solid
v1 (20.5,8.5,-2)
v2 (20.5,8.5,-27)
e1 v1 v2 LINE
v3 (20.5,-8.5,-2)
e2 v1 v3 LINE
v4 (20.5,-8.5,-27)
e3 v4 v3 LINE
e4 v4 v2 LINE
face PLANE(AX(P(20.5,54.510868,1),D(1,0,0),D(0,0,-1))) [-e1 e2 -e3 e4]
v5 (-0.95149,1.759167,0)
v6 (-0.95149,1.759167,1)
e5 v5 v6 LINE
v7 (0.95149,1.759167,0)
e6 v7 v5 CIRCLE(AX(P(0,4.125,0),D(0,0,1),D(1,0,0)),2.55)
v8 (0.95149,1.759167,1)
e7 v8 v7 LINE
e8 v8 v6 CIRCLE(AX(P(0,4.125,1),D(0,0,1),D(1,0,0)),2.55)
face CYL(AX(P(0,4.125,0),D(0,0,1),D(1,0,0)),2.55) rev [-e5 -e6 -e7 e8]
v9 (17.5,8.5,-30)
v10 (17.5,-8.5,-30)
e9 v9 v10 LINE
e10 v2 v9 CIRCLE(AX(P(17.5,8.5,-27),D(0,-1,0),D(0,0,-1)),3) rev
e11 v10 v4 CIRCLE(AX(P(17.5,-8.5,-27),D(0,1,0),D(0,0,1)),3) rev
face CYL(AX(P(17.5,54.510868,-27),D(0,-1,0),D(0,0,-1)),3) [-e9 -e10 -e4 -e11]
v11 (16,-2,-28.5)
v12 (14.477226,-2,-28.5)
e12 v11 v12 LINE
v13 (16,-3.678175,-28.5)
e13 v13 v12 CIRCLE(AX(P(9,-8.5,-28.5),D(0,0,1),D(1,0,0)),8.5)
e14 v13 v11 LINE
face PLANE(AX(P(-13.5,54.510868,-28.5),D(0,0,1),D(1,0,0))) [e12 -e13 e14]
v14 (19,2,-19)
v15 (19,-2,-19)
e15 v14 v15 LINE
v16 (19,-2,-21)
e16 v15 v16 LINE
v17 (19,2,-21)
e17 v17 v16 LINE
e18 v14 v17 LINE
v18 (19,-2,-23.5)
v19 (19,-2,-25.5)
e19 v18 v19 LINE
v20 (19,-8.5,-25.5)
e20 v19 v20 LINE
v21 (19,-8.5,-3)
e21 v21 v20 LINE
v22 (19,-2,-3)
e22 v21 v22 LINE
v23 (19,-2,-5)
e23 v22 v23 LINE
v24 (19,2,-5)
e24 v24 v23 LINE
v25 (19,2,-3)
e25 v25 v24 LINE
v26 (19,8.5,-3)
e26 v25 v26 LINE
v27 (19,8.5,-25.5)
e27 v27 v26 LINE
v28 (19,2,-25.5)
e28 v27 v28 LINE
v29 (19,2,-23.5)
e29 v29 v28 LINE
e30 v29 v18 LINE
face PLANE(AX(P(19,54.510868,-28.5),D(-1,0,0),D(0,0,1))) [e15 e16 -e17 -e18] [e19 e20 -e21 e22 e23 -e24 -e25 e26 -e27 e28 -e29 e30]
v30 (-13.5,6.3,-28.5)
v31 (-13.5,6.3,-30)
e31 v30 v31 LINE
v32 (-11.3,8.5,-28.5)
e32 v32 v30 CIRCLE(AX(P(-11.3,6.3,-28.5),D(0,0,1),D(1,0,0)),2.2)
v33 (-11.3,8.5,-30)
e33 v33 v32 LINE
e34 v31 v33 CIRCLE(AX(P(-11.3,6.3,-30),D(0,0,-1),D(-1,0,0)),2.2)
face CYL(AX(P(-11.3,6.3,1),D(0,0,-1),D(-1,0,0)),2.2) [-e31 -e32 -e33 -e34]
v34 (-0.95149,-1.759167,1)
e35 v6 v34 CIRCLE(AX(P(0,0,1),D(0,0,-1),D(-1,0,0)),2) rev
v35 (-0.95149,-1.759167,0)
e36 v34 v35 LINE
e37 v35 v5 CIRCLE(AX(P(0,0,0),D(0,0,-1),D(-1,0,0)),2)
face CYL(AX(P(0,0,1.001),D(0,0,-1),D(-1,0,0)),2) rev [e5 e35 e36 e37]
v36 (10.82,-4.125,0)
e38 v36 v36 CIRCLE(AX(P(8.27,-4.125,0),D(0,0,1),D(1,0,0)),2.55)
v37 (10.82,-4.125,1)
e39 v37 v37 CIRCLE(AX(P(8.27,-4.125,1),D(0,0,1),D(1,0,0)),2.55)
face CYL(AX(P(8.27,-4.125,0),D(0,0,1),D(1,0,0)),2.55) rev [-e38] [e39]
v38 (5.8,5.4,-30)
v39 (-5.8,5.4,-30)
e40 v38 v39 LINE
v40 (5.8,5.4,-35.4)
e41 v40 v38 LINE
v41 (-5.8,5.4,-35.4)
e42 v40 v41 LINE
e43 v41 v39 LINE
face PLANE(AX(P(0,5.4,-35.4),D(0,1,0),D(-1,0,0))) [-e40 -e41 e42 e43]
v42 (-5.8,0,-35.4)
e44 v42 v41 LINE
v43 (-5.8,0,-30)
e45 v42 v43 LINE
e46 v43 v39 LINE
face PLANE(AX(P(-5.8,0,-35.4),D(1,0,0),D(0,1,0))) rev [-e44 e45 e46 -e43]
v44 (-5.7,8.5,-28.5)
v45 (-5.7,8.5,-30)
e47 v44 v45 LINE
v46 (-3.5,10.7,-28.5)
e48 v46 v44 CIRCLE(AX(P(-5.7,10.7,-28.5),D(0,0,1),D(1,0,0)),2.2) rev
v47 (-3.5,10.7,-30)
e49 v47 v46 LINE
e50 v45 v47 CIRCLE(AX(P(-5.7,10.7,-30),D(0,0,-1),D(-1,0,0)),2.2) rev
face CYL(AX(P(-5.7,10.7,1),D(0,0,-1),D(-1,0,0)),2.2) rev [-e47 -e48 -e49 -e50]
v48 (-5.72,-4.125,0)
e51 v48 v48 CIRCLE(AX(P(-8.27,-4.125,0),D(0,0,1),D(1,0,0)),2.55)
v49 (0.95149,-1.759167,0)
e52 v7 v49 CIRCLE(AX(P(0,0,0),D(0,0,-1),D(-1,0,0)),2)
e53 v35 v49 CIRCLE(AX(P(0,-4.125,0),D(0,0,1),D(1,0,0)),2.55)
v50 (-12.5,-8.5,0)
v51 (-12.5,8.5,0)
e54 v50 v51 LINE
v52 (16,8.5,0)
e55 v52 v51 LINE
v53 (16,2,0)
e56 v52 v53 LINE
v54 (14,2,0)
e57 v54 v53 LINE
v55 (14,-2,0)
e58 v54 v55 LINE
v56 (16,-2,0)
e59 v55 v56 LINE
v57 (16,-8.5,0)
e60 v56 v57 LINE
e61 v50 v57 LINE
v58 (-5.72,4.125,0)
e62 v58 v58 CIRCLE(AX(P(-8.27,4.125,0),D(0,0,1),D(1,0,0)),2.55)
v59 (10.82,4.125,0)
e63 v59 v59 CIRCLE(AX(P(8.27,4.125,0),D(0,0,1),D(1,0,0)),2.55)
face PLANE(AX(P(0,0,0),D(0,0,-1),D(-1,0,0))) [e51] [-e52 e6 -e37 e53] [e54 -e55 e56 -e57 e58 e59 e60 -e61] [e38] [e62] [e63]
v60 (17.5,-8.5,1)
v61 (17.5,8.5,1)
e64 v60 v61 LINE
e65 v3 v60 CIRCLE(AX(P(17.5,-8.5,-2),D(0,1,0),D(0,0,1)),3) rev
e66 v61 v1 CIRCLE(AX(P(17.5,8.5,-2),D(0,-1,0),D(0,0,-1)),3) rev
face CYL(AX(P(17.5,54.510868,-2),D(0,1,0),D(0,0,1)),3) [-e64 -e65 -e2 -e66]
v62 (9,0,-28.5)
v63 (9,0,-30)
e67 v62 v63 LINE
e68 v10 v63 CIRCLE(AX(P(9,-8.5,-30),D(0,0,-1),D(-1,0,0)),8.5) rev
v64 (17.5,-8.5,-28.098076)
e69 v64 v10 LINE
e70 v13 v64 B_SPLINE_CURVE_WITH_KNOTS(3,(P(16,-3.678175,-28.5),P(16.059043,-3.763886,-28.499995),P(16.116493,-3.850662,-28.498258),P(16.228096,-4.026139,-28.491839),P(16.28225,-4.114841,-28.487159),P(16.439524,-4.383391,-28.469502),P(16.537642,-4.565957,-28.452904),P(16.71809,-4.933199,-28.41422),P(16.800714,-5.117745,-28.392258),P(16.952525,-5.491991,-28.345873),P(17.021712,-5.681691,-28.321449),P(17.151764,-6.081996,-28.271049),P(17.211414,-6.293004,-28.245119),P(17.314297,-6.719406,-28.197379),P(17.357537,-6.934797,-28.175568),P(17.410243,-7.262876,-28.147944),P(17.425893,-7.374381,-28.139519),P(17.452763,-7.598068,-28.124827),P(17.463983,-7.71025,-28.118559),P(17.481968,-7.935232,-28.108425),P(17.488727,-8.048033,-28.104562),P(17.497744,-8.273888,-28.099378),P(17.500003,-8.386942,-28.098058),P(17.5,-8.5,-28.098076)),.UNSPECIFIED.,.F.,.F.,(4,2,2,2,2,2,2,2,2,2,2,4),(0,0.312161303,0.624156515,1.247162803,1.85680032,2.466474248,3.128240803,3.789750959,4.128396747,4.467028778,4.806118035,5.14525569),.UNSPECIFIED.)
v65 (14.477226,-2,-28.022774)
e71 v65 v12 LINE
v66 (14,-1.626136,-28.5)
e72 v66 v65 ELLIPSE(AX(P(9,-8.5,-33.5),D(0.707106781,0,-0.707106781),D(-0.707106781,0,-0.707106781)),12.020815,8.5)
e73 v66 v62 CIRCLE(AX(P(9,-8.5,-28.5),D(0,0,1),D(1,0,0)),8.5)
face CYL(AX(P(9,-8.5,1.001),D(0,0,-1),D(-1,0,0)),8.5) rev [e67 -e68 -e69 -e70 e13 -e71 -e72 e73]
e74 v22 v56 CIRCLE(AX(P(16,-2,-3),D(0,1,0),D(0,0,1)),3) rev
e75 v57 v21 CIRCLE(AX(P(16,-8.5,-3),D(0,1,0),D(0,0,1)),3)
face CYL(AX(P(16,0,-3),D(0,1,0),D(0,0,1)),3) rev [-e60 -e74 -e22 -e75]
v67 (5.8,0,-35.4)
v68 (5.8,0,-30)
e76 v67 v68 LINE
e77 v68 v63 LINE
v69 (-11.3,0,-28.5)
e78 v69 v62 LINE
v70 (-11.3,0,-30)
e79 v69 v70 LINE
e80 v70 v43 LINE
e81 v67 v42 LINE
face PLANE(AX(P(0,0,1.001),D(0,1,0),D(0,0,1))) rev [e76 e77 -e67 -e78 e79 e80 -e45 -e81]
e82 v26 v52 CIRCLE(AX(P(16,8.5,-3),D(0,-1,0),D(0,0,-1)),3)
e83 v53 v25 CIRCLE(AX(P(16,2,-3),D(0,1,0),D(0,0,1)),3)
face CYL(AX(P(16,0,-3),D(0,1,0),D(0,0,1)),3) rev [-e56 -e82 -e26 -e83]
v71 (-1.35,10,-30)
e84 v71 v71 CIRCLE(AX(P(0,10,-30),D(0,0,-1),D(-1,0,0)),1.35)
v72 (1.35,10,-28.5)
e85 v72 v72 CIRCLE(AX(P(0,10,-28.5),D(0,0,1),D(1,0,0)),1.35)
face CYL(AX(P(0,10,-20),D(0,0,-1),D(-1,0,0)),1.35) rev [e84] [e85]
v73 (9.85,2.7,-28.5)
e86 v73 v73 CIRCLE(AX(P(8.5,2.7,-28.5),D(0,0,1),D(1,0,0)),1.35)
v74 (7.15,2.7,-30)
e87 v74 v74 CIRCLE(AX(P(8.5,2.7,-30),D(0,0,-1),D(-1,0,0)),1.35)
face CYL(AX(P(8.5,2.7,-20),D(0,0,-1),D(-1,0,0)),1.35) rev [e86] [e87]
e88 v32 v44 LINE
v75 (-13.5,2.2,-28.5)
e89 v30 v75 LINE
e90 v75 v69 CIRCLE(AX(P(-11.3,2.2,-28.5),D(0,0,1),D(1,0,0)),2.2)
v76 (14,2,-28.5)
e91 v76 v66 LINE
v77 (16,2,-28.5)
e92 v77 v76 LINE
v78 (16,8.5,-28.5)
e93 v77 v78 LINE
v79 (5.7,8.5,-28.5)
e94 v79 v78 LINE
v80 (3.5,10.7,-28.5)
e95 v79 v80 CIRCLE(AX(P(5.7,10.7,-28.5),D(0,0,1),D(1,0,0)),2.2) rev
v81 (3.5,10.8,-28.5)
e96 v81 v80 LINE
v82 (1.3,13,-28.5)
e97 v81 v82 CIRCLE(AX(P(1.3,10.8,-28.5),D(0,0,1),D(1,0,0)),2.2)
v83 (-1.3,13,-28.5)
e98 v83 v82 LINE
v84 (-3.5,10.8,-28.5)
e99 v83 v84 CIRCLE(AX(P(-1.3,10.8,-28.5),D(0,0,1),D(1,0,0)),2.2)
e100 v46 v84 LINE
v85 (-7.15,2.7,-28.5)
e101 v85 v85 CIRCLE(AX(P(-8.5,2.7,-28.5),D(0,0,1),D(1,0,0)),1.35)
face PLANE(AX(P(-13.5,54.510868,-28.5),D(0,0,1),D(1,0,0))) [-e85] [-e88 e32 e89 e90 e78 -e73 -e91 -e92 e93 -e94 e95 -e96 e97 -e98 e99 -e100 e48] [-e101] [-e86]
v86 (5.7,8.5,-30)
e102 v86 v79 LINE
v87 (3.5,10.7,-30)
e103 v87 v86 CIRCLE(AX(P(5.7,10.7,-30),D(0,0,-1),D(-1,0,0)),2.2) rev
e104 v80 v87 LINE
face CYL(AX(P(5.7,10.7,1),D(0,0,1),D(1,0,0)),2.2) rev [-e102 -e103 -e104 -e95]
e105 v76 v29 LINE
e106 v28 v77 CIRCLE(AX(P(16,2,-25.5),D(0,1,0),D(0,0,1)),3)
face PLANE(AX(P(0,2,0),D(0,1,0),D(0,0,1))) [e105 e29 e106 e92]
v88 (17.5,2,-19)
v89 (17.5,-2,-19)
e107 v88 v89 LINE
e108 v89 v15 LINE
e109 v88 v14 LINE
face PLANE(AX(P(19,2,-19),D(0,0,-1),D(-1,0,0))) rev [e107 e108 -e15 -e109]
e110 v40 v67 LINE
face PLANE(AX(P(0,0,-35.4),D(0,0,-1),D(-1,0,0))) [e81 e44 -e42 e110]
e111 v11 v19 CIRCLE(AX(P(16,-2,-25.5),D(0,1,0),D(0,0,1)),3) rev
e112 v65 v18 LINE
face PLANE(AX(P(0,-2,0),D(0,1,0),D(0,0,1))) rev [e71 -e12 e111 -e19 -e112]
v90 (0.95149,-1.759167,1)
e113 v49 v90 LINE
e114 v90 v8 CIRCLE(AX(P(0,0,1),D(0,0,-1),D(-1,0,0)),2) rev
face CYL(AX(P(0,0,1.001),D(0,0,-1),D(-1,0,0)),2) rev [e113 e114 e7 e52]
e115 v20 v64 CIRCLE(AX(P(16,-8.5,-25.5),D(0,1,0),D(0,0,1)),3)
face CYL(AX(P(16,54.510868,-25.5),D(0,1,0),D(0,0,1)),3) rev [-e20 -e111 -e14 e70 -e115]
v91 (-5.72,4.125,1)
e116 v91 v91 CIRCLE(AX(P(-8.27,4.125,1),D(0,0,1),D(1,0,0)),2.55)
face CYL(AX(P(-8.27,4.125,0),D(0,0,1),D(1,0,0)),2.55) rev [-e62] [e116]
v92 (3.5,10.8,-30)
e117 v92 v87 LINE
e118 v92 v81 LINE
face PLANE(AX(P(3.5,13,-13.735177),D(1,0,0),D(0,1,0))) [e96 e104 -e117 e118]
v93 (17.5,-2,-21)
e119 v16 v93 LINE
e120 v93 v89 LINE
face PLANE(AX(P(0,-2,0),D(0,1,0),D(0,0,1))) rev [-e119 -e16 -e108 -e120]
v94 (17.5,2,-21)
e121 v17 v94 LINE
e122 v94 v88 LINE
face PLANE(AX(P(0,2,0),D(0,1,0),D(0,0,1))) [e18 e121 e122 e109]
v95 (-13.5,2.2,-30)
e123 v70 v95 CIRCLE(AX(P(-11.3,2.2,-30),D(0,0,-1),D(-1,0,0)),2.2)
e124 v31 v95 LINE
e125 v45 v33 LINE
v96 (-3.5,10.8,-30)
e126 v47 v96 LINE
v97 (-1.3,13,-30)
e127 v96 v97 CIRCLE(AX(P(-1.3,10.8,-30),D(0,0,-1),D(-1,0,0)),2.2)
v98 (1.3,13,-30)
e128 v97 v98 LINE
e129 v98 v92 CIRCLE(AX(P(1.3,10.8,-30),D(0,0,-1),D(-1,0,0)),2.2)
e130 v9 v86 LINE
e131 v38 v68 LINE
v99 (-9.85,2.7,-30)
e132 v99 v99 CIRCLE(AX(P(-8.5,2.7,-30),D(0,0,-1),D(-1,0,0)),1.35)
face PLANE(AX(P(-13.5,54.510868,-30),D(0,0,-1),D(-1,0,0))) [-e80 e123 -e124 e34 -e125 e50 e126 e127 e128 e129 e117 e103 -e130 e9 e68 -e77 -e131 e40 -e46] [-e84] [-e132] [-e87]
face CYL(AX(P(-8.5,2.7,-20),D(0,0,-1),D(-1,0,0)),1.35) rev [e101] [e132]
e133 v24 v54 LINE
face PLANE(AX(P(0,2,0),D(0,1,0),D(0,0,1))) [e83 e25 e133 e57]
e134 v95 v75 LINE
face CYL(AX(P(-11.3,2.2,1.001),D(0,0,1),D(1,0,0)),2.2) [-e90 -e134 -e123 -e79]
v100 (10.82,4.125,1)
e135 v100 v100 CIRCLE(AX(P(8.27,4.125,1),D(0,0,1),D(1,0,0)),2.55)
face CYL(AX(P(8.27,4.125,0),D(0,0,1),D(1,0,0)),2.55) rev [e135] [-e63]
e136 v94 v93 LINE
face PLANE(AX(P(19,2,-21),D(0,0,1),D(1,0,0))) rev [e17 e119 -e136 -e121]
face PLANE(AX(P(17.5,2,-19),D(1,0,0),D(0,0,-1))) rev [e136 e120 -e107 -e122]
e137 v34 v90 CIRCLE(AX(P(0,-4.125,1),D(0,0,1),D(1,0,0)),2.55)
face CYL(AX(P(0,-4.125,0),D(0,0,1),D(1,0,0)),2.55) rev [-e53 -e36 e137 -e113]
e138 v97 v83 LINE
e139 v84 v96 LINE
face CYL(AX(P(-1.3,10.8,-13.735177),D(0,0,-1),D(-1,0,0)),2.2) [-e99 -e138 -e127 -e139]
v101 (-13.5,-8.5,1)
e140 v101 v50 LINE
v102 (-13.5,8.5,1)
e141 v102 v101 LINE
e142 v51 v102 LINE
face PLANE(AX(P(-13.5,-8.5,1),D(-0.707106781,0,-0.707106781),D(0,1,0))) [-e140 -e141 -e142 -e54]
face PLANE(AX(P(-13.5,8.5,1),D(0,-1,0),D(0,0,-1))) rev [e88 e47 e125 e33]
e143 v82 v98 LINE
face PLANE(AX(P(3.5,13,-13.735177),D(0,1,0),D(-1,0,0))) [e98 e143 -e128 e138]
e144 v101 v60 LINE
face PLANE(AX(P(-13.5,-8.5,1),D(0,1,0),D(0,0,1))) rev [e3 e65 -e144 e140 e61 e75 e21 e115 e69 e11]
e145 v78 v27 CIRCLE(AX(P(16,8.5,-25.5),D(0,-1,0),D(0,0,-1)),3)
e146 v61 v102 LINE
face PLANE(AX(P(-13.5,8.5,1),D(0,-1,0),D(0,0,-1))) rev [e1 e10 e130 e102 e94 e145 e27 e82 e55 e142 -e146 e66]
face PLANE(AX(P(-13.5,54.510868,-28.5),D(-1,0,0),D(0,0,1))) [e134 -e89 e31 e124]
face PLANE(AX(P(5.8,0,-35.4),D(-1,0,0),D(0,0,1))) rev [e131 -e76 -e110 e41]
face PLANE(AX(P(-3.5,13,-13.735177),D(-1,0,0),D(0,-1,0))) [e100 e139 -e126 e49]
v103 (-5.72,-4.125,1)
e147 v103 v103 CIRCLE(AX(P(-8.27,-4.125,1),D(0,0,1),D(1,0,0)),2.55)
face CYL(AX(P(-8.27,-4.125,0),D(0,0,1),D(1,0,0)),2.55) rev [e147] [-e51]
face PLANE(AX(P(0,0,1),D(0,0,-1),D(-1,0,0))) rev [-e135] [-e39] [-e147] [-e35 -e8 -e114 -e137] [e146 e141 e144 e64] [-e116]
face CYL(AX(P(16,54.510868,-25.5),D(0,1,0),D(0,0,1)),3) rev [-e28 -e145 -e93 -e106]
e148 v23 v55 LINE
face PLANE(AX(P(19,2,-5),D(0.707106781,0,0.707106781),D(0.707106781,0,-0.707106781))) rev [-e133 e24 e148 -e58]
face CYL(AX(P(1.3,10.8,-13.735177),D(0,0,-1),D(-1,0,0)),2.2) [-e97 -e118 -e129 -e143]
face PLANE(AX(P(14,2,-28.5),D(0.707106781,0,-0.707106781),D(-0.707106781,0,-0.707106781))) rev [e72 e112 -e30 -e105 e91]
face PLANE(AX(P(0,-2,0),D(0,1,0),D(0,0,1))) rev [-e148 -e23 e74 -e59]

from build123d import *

# Parameters (mm, degrees)
SKETCH_1_W          = 27
SKETCH_1_H          = 17
EXTRUDE_1_DEPTH     = 1
SKETCH_2_R          = 2.55
CUT_EXTRUDE_1_DEPTH = 16.984367363
EXTRUDE_2_DEPTH     = 17
SKETCH_6_W          = 1.5
SKETCH_6_H          = 2
EXTRUDE_3_DEPTH     = 2
CHAMFER_1_SIZE      = 1
CUT_EXTRUDE_4_REACH = 39.316
SKETCH_8_R          = 2
FILLET_1_R          = 3
SKETCH_9_W          = 7
SKETCH_9_H          = 13
EXTRUDE_4_DEPTH     = 1.5
SKETCH_7_R          = 1.35
CUT_EXTRUDE_5_DEPTH = 10
CUT_EXTRUDE_6_REACH = 41.373
FILLET_2_R          = 2.2
SKETCH_13_W         = 11.6
SKETCH_13_H         = 5.4
EXTRUDE_6_DEPTH     = 5.4


with BuildPart() as part:
    # 草图1 → 凸台-拉伸1 (new body)
    with BuildSketch(Plane.XY):
        Rectangle(SKETCH_1_W, SKETCH_1_H)
    extrude(amount=EXTRUDE_1_DEPTH)

    # 草图2 → 切除-拉伸1 (cut, through all)
    with BuildSketch(Plane.XY.offset(1)):
        with Locations((0, 4.125)):
            Circle(SKETCH_2_R)
        with Locations((0, -4.125)):
            Circle(SKETCH_2_R)
        with Locations((8.27, 4.125)):
            Circle(SKETCH_2_R)
        with Locations((8.27, -4.125)):
            Circle(SKETCH_2_R)
        with Locations((-8.27, 4.125)):
            Circle(SKETCH_2_R)
        with Locations((-8.27, -4.125)):
            Circle(SKETCH_2_R)
    extrude(amount=-CUT_EXTRUDE_1_DEPTH, mode=Mode.SUBTRACT)

    # 草图3 → 凸台-拉伸2 (add)
    with BuildSketch(Plane.XZ.offset(8.5)):
        Polygon((13.5, 0), (19, 0), (19, -28.5), (-13.5, -28.5), (-13.5, -30), (20.5, -30), (20.5, 1), (13.5, 1), align=None)
    extrude(amount=-EXTRUDE_2_DEPTH)

    # 草图6 → 凸台-拉伸3 (add, symmetric)
    with BuildSketch(Plane(origin=(0, 0, 0), x_dir=(1, 0, 0), z_dir=(0, 1, 0))):
        Polygon((19, 0), (19, 5), (14, 0), align=None)
        Polygon((19, 28.5), (14, 28.5), (19, 23.5), align=None)
        with Locations((18.25, 20)):
            Rectangle(SKETCH_6_W, SKETCH_6_H)
    extrude(amount=EXTRUDE_3_DEPTH, both=True)

    # 倒角1
    chamfer_1_edges = [part.edges().sort_by_distance(p)[0] for p in [
        (-13.5, 0, 0),
    ]]
    chamfer(chamfer_1_edges, length=CHAMFER_1_SIZE - 0.0001)  # a hair under: the kernel refuses the full size

    # 草图8 → 切除-拉伸4 (cut, up to next)
    with BuildSketch(Plane(origin=(0, 0, 0), x_dir=(-1, 0, 0), z_dir=(0, 0, -1)), mode=Mode.PRIVATE) as cut_extrude_4_sk1:
        Circle(SKETCH_8_R)
    cut_extrude_4_tool1 = extrude(cut_extrude_4_sk1.sketch, amount=-CUT_EXTRUDE_4_REACH, mode=Mode.PRIVATE) & part.part
    add(cut_extrude_4_tool1.solids().sort_by_distance((0, 0, 0))[0], mode=Mode.SUBTRACT)

    # 圆角1
    fillet_1_edges = [part.edges().sort_by_distance(p)[0] for p in [
        (20.5, 0, 1),
        (20.5, 0, -30),
        (19, 5.25, -28.5),
        (19, 5.25, 0),
        (19, -5.25, 0),
        (19, -5.25, -28.5),
    ]]
    fillet(fillet_1_edges, radius=FILLET_1_R)

    # 草图9 → 凸台-拉伸4 (add)
    with BuildSketch(Plane(origin=(0, 0, -30), x_dir=(-1, 0, 0), z_dir=(0, 0, -1))):
        with Locations((0, 6.5)):
            Rectangle(SKETCH_9_W, SKETCH_9_H)
    extrude(amount=-EXTRUDE_4_DEPTH)

    # 草图7 → 切除-拉伸5 (cut)
    with BuildSketch(Plane(origin=(0, 0, -30), x_dir=(-1, 0, 0), z_dir=(0, 0, -1))):
        with Locations((0, 10)):
            Circle(SKETCH_7_R)
        with Locations((-8.5, 2.7)):
            Circle(SKETCH_7_R)
        with Locations((8.5, 2.7)):
            Circle(SKETCH_7_R)
    extrude(amount=-CUT_EXTRUDE_5_DEPTH, mode=Mode.SUBTRACT)

    # 草图11 → 切除-拉伸6 (cut, up to next)
    with BuildSketch(Plane(origin=(0, 0, -30), x_dir=(-1, 0, 0), z_dir=(0, 0, -1)), mode=Mode.PRIVATE) as cut_extrude_6_sk1:
        with BuildLine():
            Line((13.5, -8.5), (13.5, 0))
            Line((13.5, 0), (-9, 0))
            ThreePointArc((-9, 0), (-15.01040764, -2.48959236), (-17.5, -8.5))
            Line((-17.5, -8.5), (13.5, -8.5))
        make_face()
    cut_extrude_6_tool1 = extrude(cut_extrude_6_sk1.sketch, amount=-CUT_EXTRUDE_6_REACH, mode=Mode.PRIVATE) & part.part
    add(cut_extrude_6_tool1.solids().sort_by_distance((1.149624, -4.397011, -30))[0], mode=Mode.SUBTRACT)

    # 圆角2
    fillet_2_edges = [part.edges().sort_by_distance(p)[0] for p in [
        (-3.5, 13, -29.25),
        (-3.5, 8.5, -29.25),
        (3.5, 13, -29.25),
        (3.5, 8.5, -29.25),
        (-13.5, 0, -29.25),
        (-13.5, 8.5, -29.25),
    ]]
    fillet(fillet_2_edges, radius=FILLET_2_R)

    # 草图13 → 凸台-拉伸6 (add)
    with BuildSketch(Plane(origin=(0, 0, -30), x_dir=(-1, 0, 0), z_dir=(0, 0, -1))):
        with Locations((0, 2.7)):
            Rectangle(SKETCH_13_W, SKETCH_13_H)
    extrude(amount=EXTRUDE_6_DEPTH)


solid = part.part
